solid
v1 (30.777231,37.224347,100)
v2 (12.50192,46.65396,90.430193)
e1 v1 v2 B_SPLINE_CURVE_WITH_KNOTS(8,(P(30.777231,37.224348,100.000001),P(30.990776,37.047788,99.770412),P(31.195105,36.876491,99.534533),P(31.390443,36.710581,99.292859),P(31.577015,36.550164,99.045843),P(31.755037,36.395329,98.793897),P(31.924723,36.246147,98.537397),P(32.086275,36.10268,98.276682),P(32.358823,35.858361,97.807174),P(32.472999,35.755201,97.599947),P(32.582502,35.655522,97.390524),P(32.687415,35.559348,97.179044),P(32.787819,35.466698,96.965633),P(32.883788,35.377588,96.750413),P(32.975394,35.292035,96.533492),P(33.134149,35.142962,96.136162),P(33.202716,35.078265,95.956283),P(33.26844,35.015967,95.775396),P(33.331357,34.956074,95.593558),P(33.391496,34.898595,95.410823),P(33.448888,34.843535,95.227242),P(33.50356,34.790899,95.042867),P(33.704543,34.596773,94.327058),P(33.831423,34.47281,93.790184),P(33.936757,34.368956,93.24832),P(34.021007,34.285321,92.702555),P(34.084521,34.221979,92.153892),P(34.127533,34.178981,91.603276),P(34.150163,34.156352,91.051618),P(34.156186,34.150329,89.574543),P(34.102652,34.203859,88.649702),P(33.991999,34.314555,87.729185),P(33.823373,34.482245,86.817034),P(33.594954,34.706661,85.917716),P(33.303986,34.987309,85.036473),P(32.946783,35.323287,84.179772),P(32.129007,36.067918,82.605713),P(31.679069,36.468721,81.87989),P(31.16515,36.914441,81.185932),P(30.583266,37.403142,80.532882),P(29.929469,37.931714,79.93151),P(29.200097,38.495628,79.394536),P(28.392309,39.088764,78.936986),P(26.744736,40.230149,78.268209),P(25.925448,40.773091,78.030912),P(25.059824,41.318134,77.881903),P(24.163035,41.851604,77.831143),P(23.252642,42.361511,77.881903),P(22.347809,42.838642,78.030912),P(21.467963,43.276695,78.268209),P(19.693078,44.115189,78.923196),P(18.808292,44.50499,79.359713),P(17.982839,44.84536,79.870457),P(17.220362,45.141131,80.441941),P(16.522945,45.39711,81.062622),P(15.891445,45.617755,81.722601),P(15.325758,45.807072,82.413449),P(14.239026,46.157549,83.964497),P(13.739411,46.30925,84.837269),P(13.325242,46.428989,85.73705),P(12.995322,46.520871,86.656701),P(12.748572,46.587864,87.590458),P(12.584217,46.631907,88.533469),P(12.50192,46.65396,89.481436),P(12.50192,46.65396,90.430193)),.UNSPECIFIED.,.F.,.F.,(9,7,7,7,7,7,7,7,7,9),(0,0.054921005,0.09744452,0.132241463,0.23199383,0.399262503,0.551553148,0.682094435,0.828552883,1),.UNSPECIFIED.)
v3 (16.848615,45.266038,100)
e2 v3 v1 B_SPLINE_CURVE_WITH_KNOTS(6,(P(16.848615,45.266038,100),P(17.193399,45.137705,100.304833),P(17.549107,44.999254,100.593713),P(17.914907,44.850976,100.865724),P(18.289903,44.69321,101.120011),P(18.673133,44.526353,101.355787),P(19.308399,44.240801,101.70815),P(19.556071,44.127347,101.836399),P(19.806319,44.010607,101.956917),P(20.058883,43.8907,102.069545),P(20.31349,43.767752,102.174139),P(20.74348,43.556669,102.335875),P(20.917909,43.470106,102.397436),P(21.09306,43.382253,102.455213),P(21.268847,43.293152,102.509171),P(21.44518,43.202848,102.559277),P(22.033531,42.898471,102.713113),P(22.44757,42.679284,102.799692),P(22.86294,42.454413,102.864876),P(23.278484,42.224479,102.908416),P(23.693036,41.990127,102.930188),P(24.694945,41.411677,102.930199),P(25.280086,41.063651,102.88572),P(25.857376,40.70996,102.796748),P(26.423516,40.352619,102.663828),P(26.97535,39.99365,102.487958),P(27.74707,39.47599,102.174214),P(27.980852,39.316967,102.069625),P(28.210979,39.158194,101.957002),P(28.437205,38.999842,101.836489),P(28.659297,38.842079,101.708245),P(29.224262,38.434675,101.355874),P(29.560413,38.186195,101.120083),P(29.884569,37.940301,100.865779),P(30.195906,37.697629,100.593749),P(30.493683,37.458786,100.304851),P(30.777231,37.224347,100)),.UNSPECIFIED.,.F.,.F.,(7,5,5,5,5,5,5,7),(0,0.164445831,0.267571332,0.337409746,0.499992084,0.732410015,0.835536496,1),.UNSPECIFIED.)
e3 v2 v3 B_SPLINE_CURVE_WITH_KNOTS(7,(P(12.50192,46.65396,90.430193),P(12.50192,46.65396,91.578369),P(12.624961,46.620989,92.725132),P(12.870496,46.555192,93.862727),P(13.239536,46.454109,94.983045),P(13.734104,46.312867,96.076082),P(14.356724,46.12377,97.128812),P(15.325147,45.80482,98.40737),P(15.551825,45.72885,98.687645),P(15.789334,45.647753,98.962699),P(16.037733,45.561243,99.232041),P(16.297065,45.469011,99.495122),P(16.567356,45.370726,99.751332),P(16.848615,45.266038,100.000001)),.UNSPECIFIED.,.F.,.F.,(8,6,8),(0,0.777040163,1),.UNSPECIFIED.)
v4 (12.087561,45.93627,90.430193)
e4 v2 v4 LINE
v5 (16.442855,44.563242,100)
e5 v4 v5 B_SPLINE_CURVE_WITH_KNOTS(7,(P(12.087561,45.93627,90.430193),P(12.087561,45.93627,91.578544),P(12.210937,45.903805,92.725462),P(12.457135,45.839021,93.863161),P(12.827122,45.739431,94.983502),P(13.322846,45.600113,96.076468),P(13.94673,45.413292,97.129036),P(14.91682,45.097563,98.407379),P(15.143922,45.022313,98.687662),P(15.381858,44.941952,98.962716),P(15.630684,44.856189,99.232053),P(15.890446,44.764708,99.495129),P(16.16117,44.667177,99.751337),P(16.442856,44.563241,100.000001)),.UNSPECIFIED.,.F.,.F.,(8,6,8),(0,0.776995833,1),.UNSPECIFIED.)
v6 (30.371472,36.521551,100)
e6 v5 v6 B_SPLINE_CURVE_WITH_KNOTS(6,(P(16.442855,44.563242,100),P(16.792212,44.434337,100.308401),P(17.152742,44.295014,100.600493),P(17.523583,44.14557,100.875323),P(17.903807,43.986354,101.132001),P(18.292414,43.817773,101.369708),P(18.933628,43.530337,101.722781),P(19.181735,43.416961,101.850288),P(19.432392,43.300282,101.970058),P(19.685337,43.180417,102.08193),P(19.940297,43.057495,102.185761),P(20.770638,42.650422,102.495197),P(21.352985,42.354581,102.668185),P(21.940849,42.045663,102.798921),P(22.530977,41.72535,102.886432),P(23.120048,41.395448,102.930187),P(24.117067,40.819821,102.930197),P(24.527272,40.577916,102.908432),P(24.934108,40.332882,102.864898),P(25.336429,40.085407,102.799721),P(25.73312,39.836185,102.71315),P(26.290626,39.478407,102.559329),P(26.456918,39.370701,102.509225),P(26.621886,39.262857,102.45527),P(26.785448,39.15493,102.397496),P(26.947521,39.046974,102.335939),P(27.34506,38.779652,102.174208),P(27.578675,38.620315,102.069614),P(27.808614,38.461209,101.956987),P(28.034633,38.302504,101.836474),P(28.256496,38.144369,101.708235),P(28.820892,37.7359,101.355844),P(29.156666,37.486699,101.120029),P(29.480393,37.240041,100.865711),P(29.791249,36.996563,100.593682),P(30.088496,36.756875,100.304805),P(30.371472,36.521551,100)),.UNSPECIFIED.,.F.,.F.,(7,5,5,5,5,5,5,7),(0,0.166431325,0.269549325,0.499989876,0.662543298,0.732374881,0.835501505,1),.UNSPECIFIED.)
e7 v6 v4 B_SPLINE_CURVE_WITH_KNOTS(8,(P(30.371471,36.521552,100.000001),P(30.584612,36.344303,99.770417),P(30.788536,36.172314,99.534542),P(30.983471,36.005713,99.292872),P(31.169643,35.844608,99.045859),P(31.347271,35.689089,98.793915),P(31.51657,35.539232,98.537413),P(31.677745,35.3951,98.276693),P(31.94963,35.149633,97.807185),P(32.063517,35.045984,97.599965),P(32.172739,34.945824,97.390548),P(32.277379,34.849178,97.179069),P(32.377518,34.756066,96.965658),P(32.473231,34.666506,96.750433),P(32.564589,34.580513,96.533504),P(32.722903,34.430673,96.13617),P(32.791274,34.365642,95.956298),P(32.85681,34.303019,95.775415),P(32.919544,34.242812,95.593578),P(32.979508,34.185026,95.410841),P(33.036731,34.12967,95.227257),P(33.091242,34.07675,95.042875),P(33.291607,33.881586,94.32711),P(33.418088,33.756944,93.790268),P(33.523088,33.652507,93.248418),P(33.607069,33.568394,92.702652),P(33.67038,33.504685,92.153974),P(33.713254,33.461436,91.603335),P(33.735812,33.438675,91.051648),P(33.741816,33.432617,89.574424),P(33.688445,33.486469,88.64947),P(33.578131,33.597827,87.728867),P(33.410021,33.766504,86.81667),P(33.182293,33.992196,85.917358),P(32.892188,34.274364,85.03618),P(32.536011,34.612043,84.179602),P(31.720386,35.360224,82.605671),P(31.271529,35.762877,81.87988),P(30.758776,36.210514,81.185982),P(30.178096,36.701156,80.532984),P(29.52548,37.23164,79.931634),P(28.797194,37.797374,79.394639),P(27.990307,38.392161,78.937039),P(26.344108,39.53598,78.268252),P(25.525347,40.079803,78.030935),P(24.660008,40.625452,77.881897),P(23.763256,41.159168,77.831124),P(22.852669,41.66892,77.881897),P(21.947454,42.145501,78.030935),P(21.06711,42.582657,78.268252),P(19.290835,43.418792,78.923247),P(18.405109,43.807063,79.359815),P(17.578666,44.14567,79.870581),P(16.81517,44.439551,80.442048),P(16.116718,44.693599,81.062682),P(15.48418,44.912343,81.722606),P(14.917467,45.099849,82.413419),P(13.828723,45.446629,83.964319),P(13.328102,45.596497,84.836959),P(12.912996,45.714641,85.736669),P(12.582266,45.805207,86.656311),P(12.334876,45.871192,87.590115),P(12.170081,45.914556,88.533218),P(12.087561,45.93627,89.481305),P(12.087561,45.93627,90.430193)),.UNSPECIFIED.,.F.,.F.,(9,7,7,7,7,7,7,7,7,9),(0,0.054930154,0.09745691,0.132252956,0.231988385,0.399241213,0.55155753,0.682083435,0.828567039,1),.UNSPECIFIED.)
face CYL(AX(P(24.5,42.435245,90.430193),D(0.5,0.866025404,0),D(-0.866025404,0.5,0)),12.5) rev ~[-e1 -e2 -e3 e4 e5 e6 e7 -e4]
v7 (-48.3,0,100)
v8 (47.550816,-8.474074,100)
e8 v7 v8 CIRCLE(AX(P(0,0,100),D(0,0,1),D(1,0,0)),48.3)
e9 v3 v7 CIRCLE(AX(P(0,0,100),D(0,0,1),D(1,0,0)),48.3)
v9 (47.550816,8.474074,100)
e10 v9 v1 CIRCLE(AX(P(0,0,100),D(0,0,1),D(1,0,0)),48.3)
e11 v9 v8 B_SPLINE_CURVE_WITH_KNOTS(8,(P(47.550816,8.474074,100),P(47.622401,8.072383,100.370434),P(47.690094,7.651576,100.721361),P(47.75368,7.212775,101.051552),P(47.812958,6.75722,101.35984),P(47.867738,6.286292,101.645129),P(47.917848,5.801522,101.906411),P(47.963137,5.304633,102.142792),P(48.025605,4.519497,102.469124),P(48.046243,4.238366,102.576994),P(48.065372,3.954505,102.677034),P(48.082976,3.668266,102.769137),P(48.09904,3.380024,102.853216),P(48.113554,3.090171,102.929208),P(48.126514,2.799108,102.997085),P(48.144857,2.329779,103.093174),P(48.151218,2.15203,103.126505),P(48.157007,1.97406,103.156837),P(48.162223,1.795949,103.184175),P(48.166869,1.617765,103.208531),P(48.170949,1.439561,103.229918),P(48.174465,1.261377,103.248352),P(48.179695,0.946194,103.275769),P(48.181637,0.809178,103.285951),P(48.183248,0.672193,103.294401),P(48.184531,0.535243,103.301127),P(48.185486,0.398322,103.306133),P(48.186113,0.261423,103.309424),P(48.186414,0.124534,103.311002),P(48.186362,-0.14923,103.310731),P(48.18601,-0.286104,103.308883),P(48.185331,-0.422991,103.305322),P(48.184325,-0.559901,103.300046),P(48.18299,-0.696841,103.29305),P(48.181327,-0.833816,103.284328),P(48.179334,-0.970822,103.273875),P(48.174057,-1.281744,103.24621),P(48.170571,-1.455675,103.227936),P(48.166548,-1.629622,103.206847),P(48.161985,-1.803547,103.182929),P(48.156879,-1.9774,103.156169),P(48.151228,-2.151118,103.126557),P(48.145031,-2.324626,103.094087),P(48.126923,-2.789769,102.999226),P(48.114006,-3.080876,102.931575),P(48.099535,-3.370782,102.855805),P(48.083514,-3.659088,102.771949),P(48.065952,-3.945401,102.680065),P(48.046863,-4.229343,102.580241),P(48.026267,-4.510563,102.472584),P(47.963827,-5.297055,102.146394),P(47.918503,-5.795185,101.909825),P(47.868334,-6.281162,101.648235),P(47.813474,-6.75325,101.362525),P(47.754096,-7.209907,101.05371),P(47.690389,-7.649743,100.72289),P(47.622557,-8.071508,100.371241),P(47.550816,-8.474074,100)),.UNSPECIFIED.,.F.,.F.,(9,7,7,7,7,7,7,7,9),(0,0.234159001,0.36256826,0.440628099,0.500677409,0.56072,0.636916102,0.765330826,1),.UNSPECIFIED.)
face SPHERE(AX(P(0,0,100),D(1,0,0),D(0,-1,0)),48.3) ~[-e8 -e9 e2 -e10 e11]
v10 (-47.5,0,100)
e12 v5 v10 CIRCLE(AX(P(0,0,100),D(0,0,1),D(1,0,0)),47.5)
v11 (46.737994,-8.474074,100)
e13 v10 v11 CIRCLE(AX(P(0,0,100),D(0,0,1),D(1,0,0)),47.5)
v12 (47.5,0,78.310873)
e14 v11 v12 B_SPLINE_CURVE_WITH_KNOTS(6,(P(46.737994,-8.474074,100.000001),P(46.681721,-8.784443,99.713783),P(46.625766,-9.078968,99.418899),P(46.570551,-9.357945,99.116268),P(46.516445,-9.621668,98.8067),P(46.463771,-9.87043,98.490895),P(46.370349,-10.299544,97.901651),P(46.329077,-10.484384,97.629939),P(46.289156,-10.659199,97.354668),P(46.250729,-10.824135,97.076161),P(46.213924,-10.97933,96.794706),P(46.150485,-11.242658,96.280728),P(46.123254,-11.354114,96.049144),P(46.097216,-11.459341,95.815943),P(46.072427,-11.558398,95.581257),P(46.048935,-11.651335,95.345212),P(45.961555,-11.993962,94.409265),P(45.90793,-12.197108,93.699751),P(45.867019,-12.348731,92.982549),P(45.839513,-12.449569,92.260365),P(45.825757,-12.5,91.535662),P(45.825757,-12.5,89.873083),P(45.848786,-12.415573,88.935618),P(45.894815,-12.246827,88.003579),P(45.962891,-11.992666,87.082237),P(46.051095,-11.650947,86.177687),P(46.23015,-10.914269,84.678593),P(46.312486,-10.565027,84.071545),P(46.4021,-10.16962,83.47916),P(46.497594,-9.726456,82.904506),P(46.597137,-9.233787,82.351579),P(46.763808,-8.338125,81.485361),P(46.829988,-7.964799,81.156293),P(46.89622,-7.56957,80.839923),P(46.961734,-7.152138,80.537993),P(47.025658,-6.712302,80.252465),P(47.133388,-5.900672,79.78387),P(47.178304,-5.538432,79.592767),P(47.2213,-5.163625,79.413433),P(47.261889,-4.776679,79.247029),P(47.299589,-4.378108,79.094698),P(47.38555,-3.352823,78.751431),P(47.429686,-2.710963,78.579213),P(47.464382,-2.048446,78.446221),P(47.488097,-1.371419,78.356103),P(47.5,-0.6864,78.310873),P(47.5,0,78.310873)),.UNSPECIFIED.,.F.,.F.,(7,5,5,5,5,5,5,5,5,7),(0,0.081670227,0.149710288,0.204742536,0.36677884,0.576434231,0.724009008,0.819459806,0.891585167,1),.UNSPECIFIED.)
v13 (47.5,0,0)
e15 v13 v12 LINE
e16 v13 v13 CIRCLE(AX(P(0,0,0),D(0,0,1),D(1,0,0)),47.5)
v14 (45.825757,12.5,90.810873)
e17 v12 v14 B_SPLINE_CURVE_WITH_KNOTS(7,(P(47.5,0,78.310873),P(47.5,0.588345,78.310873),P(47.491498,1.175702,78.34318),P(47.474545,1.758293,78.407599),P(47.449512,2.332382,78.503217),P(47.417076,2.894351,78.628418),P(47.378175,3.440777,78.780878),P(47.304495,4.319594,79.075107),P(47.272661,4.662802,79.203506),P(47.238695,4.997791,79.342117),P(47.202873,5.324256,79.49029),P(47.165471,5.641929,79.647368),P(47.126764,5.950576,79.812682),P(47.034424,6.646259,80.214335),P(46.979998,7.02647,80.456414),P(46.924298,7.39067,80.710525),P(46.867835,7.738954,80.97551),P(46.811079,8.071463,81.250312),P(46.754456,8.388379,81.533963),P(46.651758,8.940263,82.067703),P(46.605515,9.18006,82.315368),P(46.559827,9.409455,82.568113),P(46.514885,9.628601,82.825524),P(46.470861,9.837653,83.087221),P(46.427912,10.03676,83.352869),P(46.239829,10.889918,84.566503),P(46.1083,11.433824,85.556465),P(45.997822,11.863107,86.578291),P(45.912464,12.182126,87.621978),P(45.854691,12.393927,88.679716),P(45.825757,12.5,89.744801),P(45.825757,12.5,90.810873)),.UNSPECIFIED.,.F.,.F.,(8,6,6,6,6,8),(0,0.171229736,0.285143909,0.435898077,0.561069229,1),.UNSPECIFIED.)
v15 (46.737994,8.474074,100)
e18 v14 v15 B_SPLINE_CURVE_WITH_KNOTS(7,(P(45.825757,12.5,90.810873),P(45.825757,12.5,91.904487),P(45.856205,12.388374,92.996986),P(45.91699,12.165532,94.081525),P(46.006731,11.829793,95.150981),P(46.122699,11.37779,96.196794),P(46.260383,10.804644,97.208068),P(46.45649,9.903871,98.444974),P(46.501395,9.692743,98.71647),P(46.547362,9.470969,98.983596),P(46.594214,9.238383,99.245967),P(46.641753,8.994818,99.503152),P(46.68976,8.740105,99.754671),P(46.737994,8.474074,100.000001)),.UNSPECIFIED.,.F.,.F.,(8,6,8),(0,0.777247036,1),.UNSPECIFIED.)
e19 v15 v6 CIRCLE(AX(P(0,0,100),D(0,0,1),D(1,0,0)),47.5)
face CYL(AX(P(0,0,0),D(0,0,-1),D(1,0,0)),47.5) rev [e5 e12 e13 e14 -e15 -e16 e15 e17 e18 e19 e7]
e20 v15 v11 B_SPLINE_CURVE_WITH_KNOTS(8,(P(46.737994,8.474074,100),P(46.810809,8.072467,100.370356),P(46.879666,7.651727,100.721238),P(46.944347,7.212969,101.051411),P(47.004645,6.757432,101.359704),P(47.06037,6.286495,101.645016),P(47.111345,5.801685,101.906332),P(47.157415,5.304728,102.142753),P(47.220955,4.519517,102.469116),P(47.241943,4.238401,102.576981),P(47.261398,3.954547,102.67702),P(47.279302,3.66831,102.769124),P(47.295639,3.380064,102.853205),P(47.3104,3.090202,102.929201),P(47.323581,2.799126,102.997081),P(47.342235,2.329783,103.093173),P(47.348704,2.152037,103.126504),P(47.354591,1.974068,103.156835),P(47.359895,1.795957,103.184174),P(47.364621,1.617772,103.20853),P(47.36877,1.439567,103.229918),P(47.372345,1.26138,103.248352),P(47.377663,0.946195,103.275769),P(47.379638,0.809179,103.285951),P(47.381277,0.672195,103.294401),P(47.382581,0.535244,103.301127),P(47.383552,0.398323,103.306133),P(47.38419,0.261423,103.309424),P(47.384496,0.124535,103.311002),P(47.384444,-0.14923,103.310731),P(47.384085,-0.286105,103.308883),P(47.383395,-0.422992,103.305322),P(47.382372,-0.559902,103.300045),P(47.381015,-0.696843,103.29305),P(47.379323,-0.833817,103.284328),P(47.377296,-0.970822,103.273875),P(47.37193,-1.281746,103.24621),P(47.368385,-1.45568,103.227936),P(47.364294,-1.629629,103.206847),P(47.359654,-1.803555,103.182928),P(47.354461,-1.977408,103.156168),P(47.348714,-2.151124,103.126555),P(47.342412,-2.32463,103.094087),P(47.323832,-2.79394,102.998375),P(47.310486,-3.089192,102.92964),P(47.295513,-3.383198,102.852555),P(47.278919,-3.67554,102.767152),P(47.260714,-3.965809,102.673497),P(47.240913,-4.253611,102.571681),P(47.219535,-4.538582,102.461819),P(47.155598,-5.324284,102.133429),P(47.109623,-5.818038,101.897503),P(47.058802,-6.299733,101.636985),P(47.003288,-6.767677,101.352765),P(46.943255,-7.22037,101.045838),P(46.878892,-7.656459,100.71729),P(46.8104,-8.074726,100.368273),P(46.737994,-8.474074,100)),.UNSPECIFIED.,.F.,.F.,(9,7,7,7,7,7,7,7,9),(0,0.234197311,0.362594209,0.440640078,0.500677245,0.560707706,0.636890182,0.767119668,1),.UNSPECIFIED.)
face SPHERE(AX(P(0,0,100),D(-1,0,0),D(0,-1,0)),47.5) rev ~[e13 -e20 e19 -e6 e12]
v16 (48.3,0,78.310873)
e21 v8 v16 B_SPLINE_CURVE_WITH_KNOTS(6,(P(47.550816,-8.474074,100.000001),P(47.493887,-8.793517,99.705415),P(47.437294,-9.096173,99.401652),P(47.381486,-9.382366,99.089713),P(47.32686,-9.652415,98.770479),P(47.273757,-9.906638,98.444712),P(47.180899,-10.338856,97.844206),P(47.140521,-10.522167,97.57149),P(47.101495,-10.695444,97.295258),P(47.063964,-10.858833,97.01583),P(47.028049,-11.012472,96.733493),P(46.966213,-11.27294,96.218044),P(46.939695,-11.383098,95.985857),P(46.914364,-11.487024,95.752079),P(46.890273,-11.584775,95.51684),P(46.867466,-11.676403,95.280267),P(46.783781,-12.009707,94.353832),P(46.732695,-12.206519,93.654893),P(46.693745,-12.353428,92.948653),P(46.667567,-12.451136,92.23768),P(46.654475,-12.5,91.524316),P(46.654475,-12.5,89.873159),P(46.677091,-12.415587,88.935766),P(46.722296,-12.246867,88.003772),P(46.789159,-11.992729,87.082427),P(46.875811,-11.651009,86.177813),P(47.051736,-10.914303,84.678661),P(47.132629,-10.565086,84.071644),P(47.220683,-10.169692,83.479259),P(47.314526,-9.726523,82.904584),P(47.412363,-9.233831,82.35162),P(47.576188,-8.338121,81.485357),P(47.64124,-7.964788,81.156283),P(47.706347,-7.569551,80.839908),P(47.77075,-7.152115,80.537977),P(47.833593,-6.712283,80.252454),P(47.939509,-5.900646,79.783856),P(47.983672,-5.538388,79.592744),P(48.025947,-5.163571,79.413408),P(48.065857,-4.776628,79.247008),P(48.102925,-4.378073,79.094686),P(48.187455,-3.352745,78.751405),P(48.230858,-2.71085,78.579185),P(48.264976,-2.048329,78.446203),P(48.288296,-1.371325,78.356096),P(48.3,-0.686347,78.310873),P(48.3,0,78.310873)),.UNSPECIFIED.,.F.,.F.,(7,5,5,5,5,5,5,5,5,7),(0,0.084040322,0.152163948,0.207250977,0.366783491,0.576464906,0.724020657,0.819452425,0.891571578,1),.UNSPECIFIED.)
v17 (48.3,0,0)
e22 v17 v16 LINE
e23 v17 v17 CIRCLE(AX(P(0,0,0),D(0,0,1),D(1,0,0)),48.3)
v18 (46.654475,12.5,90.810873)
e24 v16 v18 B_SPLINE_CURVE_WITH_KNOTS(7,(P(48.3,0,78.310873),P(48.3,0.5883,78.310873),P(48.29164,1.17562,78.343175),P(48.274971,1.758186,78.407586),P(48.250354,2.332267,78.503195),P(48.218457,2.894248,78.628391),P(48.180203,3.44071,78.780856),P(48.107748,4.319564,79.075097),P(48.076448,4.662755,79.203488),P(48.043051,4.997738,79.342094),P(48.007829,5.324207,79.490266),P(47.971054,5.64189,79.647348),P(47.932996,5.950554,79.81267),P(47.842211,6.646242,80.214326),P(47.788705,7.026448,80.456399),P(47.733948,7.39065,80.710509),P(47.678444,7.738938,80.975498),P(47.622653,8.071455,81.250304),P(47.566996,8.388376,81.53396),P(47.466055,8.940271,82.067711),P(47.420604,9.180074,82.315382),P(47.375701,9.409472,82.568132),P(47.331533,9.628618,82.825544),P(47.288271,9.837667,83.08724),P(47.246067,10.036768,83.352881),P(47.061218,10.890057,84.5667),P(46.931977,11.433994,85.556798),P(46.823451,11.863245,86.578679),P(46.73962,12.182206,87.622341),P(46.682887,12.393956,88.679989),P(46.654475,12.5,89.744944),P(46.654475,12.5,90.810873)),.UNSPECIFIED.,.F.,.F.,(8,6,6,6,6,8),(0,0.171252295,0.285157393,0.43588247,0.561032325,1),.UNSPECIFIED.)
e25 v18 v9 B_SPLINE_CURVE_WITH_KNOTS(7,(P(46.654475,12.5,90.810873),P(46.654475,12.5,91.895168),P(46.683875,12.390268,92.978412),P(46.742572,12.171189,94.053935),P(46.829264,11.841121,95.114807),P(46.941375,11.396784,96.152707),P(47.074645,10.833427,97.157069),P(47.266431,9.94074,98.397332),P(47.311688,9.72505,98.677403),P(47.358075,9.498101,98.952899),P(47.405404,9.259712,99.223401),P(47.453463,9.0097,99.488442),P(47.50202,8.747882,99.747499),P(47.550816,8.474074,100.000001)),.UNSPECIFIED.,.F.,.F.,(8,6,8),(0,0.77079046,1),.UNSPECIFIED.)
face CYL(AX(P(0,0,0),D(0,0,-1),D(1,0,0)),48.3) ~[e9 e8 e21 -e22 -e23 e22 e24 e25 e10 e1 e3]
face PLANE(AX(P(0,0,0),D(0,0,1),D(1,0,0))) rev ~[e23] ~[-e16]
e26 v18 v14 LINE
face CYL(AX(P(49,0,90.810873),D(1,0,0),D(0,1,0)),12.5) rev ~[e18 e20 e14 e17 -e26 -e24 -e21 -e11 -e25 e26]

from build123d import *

# Parameters (mm, degrees)
F0_R      = 48.3
F0_R_2    = 47.5
F1_DEPTH  = 100
F3_ANGLE  = 180
F5_R      = 12.5
F6_DEPTH  = 6
F9_R      = 12.5
F10_DEPTH = 6


with BuildPart() as f1:
    # F0 (on Top) → F1 (new body)
    with BuildSketch(Plane.XY):
        Circle(F0_R)
        Circle(F0_R_2, mode=Mode.SUBTRACT)
    extrude(amount=F1_DEPTH)

    # F2 (on face) → F3 (revolve)
    with BuildSketch(Plane.XY.offset(100)):
        with BuildLine():
            ThreePointArc((47.5, 0), (0, -47.5), (-47.5, 0))
            Line((-47.5, 0), (-48.3, 0))
            ThreePointArc((-48.3, 0), (0, -48.3), (48.3, 0))
            Line((48.3, 0), (47.5, 0))
        make_face()
    revolve(axis=Axis((-47.9, 0, 100), (-1, 0, 0)), revolution_arc=F3_ANGLE)

    # F5 (on offset) → F6 (cut)
    with BuildSketch(Plane.YZ.offset(49)):
        with Locations((0, 90.8108726144)):
            Circle(F5_R)
    extrude(amount=-F6_DEPTH, mode=Mode.SUBTRACT)

    # F9 (on face) → F10 (cut)
    with BuildSketch(Plane(origin=(24.5, 42.4352447854, 0), x_dir=(-0.8660254038, 0.5, 0), z_dir=(0.5, 0.8660254038, 0))):
        with Locations((0, 90.4301926494)):
            Circle(F9_R)
    extrude(amount=-F10_DEPTH, mode=Mode.SUBTRACT)


solid = f1.part
